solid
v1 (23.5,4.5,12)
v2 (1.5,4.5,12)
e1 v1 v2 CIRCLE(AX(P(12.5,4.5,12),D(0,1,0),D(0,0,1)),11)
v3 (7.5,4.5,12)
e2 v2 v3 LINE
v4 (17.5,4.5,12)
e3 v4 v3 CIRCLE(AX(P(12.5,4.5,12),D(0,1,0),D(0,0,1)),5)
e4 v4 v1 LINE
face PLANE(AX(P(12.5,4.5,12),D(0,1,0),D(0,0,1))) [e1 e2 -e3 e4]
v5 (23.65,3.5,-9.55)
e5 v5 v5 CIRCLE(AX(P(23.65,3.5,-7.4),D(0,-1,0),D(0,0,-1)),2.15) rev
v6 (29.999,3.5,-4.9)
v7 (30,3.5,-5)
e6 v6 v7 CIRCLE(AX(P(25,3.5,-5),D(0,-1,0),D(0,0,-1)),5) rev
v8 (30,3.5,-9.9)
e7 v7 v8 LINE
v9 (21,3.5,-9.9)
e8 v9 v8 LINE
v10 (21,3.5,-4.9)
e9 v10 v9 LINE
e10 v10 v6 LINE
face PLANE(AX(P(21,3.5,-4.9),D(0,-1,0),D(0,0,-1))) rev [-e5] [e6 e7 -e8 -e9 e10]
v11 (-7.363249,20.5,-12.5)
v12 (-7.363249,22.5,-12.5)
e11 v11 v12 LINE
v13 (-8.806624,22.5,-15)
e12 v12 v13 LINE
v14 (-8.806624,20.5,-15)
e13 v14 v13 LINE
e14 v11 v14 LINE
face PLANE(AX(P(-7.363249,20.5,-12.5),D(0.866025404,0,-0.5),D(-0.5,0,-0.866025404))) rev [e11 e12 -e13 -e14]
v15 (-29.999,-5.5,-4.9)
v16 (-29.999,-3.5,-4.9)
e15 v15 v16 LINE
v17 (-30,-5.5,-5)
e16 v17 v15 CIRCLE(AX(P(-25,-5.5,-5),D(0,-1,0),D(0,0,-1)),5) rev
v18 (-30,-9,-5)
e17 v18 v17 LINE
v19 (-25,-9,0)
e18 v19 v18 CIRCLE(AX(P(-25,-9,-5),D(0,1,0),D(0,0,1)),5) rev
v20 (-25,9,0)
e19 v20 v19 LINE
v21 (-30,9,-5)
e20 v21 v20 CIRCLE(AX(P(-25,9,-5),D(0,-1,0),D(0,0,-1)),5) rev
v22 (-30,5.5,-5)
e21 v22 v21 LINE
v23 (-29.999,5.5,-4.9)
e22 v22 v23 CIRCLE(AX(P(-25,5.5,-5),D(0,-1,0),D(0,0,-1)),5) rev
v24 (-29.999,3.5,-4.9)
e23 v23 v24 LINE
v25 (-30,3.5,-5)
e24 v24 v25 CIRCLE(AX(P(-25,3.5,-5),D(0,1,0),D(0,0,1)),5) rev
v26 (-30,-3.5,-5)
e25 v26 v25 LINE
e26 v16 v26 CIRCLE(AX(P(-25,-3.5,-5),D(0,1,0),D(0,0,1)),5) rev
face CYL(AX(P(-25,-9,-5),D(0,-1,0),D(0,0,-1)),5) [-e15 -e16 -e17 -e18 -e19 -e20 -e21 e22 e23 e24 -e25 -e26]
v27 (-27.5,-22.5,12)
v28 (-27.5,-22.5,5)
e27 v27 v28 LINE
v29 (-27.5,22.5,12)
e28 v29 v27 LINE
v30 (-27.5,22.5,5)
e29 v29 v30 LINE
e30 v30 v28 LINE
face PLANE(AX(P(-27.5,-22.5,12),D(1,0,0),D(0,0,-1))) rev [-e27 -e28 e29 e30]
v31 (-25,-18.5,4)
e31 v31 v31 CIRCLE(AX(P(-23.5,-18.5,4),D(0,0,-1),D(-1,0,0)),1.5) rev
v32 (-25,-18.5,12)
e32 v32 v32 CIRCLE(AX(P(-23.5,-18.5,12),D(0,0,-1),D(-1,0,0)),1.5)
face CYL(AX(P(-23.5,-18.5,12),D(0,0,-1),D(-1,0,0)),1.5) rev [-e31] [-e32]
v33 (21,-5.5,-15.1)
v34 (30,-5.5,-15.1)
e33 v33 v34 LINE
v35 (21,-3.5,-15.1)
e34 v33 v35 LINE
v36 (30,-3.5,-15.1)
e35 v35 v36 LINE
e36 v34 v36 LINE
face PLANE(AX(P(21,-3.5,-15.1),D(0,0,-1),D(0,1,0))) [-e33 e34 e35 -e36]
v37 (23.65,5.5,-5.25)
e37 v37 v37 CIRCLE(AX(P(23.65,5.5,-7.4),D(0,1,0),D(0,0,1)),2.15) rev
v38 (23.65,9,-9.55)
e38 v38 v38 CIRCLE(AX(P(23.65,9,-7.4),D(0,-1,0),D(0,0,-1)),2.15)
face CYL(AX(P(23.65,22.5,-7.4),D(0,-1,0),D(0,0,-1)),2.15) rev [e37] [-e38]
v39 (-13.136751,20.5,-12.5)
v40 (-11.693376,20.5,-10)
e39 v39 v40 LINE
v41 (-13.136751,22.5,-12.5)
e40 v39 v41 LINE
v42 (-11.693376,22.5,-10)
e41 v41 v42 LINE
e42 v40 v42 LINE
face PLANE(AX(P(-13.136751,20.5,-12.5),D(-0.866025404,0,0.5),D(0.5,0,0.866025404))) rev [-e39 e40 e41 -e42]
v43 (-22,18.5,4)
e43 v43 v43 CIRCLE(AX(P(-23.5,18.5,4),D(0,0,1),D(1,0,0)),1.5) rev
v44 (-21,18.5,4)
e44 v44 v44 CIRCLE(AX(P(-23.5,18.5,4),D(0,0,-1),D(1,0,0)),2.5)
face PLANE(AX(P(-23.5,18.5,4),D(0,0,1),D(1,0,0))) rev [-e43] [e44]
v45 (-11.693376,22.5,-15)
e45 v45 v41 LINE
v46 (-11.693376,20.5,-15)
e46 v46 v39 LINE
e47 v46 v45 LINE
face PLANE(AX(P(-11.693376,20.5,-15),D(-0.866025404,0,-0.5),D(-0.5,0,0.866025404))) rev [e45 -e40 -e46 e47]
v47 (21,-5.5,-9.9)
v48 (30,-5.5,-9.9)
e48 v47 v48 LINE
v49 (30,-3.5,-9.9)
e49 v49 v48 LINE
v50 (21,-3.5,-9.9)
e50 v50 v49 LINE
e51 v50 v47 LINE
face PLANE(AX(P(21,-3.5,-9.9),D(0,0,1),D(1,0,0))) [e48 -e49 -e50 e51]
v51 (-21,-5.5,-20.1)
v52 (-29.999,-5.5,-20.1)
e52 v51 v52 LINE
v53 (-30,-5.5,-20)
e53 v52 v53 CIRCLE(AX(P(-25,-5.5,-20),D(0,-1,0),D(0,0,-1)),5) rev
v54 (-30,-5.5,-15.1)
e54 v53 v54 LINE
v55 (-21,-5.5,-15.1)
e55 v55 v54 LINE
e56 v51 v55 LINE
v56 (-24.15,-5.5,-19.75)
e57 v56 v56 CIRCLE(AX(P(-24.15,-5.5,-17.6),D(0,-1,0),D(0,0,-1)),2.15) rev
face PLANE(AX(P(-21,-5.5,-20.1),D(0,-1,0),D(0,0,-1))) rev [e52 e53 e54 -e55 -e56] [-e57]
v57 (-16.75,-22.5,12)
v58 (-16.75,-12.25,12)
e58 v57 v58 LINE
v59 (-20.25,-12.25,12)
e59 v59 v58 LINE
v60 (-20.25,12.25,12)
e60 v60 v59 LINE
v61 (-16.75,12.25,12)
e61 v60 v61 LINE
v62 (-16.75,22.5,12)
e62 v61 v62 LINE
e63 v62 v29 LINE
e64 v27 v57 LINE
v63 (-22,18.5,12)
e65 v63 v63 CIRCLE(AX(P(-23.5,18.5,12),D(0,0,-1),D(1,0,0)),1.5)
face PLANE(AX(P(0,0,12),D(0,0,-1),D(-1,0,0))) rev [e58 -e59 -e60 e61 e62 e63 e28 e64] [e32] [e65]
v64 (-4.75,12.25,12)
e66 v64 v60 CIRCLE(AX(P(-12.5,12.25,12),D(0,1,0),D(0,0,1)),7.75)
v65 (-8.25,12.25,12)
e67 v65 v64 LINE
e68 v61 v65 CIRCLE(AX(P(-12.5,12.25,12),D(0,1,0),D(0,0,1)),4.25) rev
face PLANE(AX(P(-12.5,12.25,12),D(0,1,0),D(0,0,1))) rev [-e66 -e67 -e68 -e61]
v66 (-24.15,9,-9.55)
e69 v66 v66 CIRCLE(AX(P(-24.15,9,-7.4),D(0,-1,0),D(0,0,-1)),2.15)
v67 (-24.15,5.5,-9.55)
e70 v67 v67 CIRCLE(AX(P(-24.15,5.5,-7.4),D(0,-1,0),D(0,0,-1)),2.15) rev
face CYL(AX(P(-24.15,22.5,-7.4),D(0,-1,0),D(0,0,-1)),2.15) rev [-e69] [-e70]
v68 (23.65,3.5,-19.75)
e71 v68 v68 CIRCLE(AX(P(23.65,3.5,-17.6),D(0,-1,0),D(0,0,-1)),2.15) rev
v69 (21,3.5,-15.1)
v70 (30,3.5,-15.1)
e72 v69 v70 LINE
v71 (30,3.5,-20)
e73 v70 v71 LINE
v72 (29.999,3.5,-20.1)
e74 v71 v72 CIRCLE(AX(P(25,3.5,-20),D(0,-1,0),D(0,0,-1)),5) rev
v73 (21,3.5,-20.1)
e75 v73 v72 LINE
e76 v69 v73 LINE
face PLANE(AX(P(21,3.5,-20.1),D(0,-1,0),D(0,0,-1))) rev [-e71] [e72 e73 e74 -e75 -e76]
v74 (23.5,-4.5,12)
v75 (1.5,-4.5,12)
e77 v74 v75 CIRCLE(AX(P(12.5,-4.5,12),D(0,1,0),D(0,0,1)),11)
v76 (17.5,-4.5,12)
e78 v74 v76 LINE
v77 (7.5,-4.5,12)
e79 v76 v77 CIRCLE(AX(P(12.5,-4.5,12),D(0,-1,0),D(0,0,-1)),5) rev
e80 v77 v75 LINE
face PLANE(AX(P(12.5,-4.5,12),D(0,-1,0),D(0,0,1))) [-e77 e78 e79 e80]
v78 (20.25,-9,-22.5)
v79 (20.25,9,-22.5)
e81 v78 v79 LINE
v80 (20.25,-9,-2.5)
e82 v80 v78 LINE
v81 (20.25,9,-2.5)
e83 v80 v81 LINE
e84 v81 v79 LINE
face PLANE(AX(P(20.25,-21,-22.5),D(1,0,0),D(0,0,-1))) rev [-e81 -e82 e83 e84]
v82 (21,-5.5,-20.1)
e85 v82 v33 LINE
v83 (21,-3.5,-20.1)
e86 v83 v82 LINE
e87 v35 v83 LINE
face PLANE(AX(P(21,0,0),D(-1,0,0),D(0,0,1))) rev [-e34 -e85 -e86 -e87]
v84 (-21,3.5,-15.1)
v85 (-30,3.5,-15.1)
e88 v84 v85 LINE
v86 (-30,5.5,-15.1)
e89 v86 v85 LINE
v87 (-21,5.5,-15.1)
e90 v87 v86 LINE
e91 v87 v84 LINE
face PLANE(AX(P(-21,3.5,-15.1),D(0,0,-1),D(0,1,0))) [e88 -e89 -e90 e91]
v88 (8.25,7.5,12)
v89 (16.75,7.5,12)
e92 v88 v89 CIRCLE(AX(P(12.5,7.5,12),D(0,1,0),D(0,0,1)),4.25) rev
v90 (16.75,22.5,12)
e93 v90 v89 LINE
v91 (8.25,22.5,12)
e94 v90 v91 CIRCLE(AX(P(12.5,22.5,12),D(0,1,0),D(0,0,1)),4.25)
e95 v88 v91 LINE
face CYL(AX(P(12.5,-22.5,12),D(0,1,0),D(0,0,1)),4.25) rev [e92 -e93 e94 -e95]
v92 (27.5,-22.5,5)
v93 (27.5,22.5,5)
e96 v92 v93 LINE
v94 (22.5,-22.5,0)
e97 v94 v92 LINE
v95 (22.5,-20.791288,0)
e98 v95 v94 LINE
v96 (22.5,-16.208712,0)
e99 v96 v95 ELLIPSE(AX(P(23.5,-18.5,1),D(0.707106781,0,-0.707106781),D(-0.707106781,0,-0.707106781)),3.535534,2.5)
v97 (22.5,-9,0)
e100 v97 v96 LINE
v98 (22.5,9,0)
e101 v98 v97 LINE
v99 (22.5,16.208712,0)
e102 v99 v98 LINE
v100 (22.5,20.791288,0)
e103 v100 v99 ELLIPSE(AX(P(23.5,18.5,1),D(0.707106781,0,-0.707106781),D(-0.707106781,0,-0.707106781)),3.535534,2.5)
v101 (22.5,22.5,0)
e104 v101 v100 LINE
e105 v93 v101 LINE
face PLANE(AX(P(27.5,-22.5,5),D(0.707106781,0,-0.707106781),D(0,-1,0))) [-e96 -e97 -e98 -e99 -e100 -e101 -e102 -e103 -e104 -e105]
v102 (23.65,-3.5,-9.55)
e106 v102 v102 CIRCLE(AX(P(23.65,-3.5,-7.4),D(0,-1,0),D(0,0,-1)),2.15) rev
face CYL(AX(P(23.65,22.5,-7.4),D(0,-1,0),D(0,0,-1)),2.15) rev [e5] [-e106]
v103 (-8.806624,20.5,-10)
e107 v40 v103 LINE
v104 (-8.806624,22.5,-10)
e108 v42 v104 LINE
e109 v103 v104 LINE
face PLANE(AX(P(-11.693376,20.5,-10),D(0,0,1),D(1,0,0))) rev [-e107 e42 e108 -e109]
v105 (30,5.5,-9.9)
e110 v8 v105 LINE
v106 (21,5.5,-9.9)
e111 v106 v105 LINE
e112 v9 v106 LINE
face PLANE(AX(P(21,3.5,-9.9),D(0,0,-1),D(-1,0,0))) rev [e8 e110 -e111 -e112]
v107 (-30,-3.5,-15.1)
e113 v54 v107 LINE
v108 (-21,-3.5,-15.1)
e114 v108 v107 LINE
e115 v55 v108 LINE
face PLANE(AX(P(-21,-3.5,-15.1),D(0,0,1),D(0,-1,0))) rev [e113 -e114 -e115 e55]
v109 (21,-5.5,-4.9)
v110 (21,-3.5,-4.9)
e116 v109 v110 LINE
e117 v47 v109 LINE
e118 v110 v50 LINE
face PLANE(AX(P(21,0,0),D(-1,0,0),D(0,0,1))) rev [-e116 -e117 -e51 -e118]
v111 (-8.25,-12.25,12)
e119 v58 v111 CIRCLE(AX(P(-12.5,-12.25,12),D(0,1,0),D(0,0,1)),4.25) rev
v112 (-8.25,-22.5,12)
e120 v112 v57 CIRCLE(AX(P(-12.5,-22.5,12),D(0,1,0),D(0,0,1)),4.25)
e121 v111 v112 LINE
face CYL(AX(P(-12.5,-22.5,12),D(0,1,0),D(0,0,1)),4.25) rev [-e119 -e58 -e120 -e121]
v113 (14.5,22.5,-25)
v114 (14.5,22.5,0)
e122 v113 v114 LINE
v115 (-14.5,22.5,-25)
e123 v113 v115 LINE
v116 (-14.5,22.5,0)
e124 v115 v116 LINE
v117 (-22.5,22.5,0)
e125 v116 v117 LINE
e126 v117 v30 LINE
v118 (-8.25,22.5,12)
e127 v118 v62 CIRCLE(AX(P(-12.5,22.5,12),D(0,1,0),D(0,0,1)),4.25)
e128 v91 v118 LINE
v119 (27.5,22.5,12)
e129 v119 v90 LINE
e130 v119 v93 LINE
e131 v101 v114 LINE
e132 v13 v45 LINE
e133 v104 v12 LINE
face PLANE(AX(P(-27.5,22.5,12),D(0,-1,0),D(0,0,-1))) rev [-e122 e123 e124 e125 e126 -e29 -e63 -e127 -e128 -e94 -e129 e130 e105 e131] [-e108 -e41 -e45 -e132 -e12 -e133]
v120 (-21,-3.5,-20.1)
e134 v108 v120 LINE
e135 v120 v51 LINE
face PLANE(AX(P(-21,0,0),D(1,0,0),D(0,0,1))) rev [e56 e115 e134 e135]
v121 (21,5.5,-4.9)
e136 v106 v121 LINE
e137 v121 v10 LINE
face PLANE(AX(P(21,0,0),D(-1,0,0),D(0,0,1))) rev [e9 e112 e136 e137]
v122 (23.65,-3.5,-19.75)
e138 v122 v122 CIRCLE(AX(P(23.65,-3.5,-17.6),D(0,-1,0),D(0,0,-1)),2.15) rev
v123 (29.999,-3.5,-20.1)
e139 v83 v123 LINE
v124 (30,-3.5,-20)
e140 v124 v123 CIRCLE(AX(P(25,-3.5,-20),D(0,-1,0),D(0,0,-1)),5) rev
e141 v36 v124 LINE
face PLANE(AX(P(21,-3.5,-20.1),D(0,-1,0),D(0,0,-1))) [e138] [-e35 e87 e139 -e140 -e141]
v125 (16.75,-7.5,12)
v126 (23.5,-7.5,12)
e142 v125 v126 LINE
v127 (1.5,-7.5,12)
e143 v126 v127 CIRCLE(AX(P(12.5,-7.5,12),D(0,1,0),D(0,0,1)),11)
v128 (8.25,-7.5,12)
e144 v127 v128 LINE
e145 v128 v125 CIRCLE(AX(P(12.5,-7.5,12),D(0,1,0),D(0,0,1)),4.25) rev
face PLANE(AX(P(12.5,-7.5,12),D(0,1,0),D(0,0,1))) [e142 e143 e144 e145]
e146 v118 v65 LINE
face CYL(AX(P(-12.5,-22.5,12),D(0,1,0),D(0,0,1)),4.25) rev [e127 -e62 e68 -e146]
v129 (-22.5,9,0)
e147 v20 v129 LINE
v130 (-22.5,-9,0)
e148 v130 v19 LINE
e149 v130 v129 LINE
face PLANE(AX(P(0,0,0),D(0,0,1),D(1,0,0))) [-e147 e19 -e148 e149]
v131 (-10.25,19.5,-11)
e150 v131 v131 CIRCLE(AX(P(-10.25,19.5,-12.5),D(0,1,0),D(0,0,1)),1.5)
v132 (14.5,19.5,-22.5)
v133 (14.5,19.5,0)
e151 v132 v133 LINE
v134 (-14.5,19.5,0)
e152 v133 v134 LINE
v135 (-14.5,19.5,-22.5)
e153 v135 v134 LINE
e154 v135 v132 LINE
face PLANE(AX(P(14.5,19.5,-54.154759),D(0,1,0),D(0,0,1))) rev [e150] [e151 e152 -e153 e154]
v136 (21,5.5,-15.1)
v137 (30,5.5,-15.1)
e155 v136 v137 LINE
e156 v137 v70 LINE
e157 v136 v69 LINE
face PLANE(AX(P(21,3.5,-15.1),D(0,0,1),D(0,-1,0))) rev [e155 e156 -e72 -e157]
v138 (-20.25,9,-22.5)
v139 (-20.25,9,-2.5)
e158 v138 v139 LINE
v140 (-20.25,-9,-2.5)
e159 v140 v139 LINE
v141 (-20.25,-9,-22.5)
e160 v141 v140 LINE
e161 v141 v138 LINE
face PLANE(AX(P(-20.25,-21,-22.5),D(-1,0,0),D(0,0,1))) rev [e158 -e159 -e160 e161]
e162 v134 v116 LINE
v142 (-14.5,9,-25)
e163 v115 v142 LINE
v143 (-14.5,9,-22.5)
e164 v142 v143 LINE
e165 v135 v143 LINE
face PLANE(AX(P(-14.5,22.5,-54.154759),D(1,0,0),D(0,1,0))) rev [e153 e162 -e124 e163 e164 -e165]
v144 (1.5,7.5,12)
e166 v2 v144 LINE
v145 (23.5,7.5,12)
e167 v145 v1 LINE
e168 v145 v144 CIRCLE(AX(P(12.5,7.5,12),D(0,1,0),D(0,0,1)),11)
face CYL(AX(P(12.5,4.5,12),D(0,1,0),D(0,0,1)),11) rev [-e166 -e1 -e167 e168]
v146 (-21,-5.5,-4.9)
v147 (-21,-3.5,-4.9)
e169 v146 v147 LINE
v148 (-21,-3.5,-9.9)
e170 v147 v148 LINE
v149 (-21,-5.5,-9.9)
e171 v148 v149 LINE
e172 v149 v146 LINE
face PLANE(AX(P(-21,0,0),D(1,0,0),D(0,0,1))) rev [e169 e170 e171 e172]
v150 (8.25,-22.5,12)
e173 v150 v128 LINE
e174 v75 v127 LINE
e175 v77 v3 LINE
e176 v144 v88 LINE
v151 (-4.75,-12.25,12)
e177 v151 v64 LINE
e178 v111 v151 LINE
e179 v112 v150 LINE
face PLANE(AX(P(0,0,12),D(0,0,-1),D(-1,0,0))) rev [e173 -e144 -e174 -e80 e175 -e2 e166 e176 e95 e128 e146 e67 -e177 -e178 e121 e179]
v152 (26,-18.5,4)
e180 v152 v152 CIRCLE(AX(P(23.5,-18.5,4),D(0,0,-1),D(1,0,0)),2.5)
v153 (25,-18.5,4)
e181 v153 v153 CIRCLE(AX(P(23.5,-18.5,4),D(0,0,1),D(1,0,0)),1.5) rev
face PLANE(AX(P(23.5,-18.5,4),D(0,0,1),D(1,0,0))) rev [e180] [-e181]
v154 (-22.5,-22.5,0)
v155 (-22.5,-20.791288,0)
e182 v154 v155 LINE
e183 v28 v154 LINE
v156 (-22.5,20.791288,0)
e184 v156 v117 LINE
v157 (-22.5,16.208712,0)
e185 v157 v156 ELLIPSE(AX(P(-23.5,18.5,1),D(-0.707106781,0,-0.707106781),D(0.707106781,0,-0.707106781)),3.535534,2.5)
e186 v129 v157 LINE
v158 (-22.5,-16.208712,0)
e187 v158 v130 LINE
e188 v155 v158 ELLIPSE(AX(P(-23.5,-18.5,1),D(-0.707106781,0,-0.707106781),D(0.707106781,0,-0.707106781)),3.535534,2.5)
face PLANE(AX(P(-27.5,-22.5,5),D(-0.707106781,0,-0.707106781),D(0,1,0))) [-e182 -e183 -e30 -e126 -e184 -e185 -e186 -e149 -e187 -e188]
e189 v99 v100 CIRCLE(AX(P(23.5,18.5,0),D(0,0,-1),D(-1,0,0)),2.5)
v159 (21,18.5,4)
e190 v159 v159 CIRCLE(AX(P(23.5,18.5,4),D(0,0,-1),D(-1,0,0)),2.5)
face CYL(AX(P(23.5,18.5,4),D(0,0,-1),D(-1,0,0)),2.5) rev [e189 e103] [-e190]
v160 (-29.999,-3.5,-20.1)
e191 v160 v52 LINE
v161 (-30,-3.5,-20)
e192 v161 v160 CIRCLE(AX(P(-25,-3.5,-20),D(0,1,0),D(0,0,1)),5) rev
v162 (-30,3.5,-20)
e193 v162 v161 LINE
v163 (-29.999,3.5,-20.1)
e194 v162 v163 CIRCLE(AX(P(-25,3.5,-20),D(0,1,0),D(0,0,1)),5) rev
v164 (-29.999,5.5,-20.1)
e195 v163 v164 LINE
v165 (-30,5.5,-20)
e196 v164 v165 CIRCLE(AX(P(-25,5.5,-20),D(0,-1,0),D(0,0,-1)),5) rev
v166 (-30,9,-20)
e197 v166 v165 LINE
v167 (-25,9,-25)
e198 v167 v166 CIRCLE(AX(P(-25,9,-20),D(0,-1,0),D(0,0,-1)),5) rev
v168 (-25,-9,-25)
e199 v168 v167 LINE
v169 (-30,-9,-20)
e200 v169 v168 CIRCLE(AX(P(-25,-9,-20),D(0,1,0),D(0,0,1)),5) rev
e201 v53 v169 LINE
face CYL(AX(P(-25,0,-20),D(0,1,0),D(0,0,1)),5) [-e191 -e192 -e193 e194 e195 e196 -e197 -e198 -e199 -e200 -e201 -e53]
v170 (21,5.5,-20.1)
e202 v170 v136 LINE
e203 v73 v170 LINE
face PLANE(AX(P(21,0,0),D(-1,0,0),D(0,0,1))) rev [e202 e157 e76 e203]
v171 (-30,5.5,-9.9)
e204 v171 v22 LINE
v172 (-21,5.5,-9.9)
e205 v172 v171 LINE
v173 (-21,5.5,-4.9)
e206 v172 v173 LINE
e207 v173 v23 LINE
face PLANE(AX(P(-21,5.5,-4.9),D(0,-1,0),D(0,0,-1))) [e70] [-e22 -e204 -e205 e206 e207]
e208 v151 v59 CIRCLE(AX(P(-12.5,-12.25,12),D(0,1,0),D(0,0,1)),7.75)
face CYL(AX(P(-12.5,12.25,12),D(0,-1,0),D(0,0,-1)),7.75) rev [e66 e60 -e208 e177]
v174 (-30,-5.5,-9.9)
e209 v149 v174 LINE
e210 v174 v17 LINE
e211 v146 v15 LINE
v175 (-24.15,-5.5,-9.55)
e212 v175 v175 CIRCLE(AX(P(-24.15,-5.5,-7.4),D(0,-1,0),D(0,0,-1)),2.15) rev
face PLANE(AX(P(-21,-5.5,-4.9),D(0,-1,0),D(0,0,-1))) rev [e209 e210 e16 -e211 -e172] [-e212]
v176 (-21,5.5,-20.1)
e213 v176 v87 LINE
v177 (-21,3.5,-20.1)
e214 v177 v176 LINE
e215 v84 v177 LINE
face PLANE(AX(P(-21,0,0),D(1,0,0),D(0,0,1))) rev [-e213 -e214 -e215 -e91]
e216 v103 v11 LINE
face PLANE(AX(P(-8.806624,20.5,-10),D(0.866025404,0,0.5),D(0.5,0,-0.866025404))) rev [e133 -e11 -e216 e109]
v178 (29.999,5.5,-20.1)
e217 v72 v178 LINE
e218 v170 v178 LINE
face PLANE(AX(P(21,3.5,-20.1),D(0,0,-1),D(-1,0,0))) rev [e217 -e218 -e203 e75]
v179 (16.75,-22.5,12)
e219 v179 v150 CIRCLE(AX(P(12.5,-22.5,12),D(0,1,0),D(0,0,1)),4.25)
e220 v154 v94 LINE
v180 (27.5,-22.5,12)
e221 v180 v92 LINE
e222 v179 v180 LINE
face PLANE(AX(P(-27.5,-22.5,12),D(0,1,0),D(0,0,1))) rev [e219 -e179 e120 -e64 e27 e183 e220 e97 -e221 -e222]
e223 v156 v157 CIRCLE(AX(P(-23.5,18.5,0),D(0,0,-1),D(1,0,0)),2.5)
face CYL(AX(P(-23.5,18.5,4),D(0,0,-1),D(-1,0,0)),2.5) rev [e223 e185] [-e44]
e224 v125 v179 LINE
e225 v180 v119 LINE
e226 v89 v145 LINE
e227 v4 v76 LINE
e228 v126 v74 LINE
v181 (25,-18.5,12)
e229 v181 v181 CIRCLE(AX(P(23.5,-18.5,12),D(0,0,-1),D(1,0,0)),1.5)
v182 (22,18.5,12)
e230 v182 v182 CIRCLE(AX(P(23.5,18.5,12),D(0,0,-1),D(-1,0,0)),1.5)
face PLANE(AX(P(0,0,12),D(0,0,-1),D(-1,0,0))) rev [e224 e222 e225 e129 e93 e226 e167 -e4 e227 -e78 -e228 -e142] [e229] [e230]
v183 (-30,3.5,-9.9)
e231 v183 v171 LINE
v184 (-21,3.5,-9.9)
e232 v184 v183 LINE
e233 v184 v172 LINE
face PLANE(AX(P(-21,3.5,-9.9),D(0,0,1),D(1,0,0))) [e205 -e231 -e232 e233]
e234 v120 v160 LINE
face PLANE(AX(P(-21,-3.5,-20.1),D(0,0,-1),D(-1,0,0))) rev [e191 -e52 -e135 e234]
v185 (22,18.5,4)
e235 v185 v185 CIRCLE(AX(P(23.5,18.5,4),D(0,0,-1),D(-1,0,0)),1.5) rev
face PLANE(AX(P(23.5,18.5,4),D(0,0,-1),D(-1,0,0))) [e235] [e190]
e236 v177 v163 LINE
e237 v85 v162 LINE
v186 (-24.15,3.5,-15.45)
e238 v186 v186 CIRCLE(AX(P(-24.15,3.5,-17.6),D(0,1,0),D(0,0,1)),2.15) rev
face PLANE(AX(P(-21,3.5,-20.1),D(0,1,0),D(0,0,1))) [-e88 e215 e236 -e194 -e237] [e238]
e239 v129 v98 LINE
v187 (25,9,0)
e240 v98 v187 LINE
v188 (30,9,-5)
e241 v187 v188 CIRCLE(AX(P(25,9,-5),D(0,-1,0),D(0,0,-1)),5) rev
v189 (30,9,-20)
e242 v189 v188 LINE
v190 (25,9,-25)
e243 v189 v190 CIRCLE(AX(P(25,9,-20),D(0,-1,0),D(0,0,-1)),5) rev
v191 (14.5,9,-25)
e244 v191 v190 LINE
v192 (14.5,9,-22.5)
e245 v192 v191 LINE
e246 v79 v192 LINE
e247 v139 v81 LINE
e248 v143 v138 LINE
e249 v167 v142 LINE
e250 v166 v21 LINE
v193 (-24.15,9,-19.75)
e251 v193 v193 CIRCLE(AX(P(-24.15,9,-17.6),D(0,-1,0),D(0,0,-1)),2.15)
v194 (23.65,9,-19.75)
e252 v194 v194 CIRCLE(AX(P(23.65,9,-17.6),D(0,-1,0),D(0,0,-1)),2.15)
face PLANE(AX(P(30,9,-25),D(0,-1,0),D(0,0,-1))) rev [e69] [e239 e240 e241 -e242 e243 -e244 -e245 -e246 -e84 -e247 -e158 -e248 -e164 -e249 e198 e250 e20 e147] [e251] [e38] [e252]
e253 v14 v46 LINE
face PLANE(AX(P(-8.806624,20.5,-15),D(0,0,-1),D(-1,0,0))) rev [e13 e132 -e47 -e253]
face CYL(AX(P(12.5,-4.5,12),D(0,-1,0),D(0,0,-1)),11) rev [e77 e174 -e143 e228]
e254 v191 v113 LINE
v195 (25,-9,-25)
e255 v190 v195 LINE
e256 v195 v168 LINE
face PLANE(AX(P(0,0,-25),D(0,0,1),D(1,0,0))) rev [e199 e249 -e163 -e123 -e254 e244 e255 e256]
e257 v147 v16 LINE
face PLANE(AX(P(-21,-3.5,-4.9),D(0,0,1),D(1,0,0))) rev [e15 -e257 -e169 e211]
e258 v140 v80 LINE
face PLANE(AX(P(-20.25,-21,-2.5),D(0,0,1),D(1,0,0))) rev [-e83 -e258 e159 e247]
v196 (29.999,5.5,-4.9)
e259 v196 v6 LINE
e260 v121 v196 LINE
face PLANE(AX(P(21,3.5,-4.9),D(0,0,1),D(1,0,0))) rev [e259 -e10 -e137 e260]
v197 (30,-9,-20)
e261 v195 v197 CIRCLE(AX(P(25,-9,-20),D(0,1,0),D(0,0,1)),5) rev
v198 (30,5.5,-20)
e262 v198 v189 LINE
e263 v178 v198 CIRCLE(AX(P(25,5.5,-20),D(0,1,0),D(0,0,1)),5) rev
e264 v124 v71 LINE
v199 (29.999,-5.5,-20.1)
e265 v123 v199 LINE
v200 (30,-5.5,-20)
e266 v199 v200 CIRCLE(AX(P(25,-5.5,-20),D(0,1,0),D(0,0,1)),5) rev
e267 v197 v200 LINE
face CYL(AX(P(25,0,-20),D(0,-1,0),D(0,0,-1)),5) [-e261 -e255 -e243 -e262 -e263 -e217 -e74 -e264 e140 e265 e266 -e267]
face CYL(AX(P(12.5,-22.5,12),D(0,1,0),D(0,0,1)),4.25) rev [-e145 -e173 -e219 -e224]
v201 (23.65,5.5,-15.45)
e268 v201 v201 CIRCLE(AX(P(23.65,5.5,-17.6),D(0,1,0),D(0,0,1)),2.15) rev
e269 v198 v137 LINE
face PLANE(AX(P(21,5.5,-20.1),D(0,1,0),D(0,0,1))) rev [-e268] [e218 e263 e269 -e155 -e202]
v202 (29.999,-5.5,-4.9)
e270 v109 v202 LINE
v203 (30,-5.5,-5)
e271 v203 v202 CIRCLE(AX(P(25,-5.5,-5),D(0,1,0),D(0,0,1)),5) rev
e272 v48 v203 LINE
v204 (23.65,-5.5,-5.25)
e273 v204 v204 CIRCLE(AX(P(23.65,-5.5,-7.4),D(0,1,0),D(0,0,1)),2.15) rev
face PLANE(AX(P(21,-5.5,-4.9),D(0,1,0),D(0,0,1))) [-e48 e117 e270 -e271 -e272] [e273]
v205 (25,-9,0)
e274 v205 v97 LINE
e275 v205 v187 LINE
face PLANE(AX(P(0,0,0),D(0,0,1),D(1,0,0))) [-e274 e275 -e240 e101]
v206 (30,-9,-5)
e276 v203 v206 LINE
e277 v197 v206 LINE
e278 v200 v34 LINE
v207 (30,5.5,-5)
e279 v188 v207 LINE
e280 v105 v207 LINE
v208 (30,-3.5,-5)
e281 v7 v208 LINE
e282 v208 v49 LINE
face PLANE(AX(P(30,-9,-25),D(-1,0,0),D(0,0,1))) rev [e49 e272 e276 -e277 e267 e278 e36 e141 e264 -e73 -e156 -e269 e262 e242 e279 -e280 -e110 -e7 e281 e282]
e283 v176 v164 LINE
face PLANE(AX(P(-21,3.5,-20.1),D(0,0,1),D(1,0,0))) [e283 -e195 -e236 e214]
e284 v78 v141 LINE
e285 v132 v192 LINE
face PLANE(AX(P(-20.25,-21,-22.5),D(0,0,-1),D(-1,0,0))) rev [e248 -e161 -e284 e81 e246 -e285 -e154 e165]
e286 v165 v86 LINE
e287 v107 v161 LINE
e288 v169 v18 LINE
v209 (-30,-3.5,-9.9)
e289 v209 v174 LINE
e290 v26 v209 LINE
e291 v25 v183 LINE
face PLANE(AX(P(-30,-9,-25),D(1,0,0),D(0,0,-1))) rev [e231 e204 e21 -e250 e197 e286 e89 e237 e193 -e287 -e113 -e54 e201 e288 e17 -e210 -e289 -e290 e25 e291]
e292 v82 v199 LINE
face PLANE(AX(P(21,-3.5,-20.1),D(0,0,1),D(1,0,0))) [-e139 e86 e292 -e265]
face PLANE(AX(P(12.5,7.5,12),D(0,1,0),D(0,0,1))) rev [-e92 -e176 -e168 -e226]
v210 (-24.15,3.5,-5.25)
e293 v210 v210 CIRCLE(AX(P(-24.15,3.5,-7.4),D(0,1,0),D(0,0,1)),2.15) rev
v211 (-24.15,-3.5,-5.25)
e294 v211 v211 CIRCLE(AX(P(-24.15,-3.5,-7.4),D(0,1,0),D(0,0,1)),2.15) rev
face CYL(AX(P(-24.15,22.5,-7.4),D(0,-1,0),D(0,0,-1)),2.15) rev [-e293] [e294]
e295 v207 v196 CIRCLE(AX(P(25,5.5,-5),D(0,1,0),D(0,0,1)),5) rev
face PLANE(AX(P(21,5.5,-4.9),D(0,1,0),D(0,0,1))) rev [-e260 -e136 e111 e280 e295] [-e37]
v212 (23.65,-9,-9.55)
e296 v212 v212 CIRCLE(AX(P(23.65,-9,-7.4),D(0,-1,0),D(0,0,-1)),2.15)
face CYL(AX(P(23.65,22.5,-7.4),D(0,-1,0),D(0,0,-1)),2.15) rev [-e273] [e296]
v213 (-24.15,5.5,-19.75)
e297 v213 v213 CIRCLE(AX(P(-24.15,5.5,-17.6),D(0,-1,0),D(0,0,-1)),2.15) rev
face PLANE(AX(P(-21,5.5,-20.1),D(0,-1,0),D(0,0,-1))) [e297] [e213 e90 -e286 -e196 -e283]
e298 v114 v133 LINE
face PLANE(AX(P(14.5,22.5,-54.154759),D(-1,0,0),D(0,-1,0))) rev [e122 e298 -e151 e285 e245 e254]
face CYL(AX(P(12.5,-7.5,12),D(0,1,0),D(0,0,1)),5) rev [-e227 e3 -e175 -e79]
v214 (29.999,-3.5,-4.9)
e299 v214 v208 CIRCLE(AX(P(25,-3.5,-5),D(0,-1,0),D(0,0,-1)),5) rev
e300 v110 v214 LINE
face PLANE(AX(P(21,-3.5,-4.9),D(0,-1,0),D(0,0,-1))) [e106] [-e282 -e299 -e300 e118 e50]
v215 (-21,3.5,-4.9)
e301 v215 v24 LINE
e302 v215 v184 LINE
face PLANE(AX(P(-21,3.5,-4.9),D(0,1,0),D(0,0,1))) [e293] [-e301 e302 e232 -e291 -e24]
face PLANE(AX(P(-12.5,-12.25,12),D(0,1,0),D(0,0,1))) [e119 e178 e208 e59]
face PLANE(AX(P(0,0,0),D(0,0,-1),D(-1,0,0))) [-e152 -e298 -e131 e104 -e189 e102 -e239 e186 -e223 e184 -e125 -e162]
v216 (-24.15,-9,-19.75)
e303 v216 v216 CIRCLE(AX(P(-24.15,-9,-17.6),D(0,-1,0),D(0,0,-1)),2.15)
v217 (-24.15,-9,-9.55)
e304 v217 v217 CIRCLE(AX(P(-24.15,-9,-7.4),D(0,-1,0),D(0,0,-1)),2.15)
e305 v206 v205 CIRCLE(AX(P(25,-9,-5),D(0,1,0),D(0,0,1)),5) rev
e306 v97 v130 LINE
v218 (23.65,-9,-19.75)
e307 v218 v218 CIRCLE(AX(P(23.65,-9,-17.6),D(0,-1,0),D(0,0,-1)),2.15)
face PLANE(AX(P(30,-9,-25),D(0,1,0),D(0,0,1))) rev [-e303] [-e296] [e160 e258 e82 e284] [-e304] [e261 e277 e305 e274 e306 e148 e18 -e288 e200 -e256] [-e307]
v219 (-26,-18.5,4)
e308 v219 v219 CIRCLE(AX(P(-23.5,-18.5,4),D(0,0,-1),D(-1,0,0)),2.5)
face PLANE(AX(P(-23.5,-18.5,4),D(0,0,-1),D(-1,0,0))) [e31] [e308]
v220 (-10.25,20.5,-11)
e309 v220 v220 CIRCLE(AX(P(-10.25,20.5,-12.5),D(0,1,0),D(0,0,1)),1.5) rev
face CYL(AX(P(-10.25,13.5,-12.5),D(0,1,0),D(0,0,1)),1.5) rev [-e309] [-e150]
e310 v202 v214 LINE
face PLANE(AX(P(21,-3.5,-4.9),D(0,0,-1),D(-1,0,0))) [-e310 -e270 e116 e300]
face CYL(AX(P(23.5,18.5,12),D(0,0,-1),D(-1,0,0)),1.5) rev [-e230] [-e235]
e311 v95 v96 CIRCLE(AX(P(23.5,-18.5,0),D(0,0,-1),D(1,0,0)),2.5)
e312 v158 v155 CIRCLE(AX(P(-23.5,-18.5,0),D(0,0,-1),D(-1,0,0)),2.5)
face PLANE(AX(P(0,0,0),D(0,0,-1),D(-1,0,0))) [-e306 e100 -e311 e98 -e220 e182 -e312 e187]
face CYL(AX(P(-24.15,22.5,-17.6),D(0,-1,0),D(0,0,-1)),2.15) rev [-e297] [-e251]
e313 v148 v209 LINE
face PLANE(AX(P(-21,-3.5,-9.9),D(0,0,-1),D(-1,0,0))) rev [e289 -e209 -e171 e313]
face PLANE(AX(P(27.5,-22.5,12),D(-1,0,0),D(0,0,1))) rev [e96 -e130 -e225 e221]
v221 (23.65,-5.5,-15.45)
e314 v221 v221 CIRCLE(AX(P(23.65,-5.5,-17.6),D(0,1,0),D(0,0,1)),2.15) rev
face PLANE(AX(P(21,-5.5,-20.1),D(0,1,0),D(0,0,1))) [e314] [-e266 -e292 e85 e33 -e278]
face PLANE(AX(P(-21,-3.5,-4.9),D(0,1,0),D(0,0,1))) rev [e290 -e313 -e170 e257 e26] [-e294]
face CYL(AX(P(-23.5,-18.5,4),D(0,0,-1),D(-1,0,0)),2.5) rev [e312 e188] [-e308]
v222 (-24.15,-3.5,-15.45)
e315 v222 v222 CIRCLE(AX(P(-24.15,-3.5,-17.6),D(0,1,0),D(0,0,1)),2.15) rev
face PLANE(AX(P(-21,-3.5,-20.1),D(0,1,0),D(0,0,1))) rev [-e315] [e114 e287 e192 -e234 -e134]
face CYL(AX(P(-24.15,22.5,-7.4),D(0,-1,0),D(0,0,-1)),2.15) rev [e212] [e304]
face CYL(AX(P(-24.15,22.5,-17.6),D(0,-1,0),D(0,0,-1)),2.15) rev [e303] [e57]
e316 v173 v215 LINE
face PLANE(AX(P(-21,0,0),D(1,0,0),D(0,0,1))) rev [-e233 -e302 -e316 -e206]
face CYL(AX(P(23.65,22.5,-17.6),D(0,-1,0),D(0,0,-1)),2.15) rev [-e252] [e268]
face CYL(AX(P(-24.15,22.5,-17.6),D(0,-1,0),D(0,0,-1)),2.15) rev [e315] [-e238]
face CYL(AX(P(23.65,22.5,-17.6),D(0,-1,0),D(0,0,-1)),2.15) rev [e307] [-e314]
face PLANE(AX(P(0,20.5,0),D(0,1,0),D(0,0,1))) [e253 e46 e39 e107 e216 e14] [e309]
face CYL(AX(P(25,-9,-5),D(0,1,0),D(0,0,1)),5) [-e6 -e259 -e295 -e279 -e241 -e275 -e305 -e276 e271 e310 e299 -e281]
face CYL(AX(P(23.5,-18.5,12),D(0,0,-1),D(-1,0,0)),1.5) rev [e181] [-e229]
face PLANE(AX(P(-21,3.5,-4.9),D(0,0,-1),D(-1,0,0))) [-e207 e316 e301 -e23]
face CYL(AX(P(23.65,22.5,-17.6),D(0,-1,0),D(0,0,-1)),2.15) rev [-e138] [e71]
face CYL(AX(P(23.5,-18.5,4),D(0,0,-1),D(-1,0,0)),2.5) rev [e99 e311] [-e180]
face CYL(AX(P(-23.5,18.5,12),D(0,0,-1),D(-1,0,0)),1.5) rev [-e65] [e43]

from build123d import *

# Parameters (mm, degrees)
ESQUISSE1_W                  = 55
ESQUISSE1_H                  = 45
BOSS_EXTRU_1_DEPTH           = 12
ESQUISSE2_R                  = 4.25
ENL_V_MAT_EXTRU_1_DEPTH      = 55.085580333
ENL_V_MAT_EXTRU_2_DEPTH      = 12.25
ENL_V_MAT_EXTRU_2_DEPTH_BACK = 12.25
ESQUISSE3_R                  = 7.75
ESQUISSE4_R                  = 11
ENL_V_MAT_EXTRU_3_DEPTH      = 3
ESQUISSE5_R                  = 5
ENL_V_MAT_EXTRU_4_DEPTH      = 15
ENL_V_MAT_EXTRU_5_DEPTH      = 38.503333185
ENL_V_MAT_EXTRU_5_DEPTH_BACK = 38.503333185
ESQUISSE6_R                  = 1.5
ESQUISSE7_R                  = 2.5
ENL_V_MAT_EXTRU_6_DEPTH      = 4
CHANFREIN3_SIZE              = 5
ESQUISSE9_W                  = 60
ESQUISSE9_H                  = 18
BOSS_EXTRU_2_DEPTH           = 25
ESQUISSE10_W                 = 40.5
ESQUISSE10_H                 = 20
ENL_V_MAT_EXTRU_7_DEPTH      = 30
ESQUISSE11_R                 = 2.15
ENL_V_MAT_EXTRU_8_DEPTH      = 51.17220346
CONG_2_R                     = 5
CONG_3_R                     = 5
ESQUISSE12_W                 = 5
ESQUISSE12_H                 = 2
ENL_V_MAT_EXTRU_9_DEPTH      = 9
SYM_TRIE4_COPY_1_SKETCH_W    = 5
SYM_TRIE4_COPY_1_SKETCH_H    = 2
SYM_TRIE4_COPY_1_DEPTH       = 9
ESQUISSE13_W                 = 29
ESQUISSE13_H                 = 3
BOSS_EXTRU_3_DEPTH           = 25
BOSS_EXTRU_4_REACH           = 52.172
ESQUISSE14_W                 = 29
ESQUISSE14_H                 = 2.5
ESQUISSE15_R                 = 1.5
ENL_V_MAT_EXTRU_10_DEPTH     = 9
ENL_V_MAT_EXTRU_11_DEPTH     = 2


with BuildPart() as part:
    # Esquisse1 → Boss.-Extru.1 (new body)
    with BuildSketch(Plane.XY):
        Rectangle(ESQUISSE1_W, ESQUISSE1_H)
    extrude(amount=BOSS_EXTRU_1_DEPTH)

    # Esquisse2 → Enlèv. mat.-Extru.1 (cut, through all)
    with BuildSketch(Plane(origin=(0, 22.5, 0), x_dir=(1, 0, 0), z_dir=(0, 1, 0))):
        with Locations((-12.5, -12)):
            Circle(ESQUISSE2_R)
        with Locations((12.5, -12)):
            Circle(ESQUISSE2_R)
    extrude(amount=-ENL_V_MAT_EXTRU_1_DEPTH, mode=Mode.SUBTRACT)

    # Esquisse3 → Enlèv. mat.-Extru.2 (cut, two sides: drawn at the far end of the back side and taken through both)
    with BuildSketch(Plane(origin=(0, 0, 0), x_dir=(1, 0, 0), z_dir=(0, 1, 0)).offset(-ENL_V_MAT_EXTRU_2_DEPTH_BACK)):
        with Locations((-12.5, -12)):
            Circle(ESQUISSE3_R)
    extrude(amount=ENL_V_MAT_EXTRU_2_DEPTH + ENL_V_MAT_EXTRU_2_DEPTH_BACK, mode=Mode.SUBTRACT)

    # Esquisse4 → Enlèv. mat.-Extru.3 (cut)
    with BuildSketch(Plane(origin=(0, 7.5, 0), x_dir=(1, 0, 0), z_dir=(0, 1, 0))):
        with Locations((12.5, -12)):
            Circle(ESQUISSE4_R)
    enl_v_mat_extru_3 = extrude(amount=-ENL_V_MAT_EXTRU_3_DEPTH, mode=Mode.SUBTRACT)

    # Esquisse5 → Enlèv. mat.-Extru.4 (cut)
    with BuildSketch(Plane(origin=(0, 7.5, 0), x_dir=(1, 0, 0), z_dir=(0, 1, 0))):
        with Locations((12.5, -12)):
            Circle(ESQUISSE5_R)
    extrude(amount=-ENL_V_MAT_EXTRU_4_DEPTH, mode=Mode.SUBTRACT)

    # Esquisse6 → Enlèv. mat.-Extru.5 (cut, two sides: drawn at the far end of the back side and taken through both)
    with BuildSketch(Plane(origin=(0, 0, 0), x_dir=(-1, 0, 0), z_dir=(0, 0, -1)).offset(-ENL_V_MAT_EXTRU_5_DEPTH_BACK)):
        with Locations((23.5, -18.5)):
            Circle(ESQUISSE6_R)
        with Locations((-23.5, -18.5)):
            Circle(ESQUISSE6_R)
        with Locations((-23.5, 18.5)):
            Circle(ESQUISSE6_R)
        with Locations((23.5, 18.5)):
            Circle(ESQUISSE6_R)
    extrude(amount=ENL_V_MAT_EXTRU_5_DEPTH + ENL_V_MAT_EXTRU_5_DEPTH_BACK, mode=Mode.SUBTRACT)

    # Esquisse7 → Enlèv. mat.-Extru.6 (cut)
    with BuildSketch(Plane(origin=(0, 0, 0), x_dir=(-1, 0, 0), z_dir=(0, 0, -1))):
        with Locations((23.5, -18.5)):
            Circle(ESQUISSE7_R)
        with Locations(Location((23.5, 18.5, 0), (0, 0, 180))):
            Circle(ESQUISSE7_R)
        with Locations((-23.5, 18.5)):
            Circle(ESQUISSE7_R)
        with Locations(Location((-23.5, -18.5, 0), (0, 0, 180))):
            Circle(ESQUISSE7_R)
    extrude(amount=-ENL_V_MAT_EXTRU_6_DEPTH, mode=Mode.SUBTRACT)

    # Chanfrein3
    # the kernel refuses this chamfer: 5 mm, written as the material it takes off along each edge
    with BuildSketch(Plane(origin=(-27.5, 35.35841494, 0), x_dir=(0.9996219169112968, 0, -0.027495876610586372), z_dir=(0, -1, 0)), Plane(origin=(27.5, -35.35841494, 0), x_dir=(-0.9996219169112968, 0, -0.027495876610586372), z_dir=(0, 1, 0))) as chanfrein3_piece_1:
        Polygon((CHANFREIN3_SIZE * 0.999621916911, CHANFREIN3_SIZE * 0.0274958766106), (-CHANFREIN3_SIZE * 0.0274958766106, CHANFREIN3_SIZE * 0.999621916911), (0, 0), align=None)
    extrude(amount=70.71682988, mode=Mode.SUBTRACT)

    # Symétrie2: Enlèv. mat.-Extru.3 across plane
    add(enl_v_mat_extru_3.mirror(Plane.ZX), mode=Mode.SUBTRACT)

    # Esquisse9 → Boss.-Extru.2 (add)
    with BuildSketch(Plane(origin=(0, 0, 0), x_dir=(-1, 0, 0), z_dir=(0, 0, -1))):
        Rectangle(ESQUISSE9_W, ESQUISSE9_H)
    extrude(amount=BOSS_EXTRU_2_DEPTH)

    # Esquisse10 → Enlèv. mat.-Extru.7 (cut)
    with BuildSketch(Plane(origin=(0, 9, 0), x_dir=(1, 0, 0), z_dir=(0, 1, 0))):
        with Locations((0, 12.5)):
            Rectangle(ESQUISSE10_W, ESQUISSE10_H)
    extrude(amount=-ENL_V_MAT_EXTRU_7_DEPTH, mode=Mode.SUBTRACT)

    # Esquisse11 → Enlèv. mat.-Extru.8 (cut, through all)
    with BuildSketch(Plane(origin=(0, -9, 0), x_dir=(-1, 0, 0), z_dir=(0, -1, 0))):
        with Locations(Location((-23.65, 7.4, 0), (0, 0, 90))):
            Circle(ESQUISSE11_R)
        with Locations(Location((-23.65, 17.6, 0), (0, 0, 90))):
            Circle(ESQUISSE11_R)
        with Locations(Location((24.15, 7.4, 0), (0, 0, 90))):
            Circle(ESQUISSE11_R)
        with Locations(Location((24.15, 17.6, 0), (0, 0, 90))):
            Circle(ESQUISSE11_R)
    extrude(amount=-ENL_V_MAT_EXTRU_8_DEPTH, mode=Mode.SUBTRACT)

    # Congé2
    cong_2_edges = [part.edges().sort_by_distance(p)[0] for p in [
        (-30, 0, 0),
        (30, 0, 0),
    ]]
    fillet(cong_2_edges, radius=CONG_2_R)

    # Congé3
    cong_3_edges = [part.edges().sort_by_distance(p)[0] for p in [
        (-30, 0, -25),
        (30, 0, -25),
    ]]
    fillet(cong_3_edges, radius=CONG_3_R)

    # Esquisse12 → Enlèv. mat.-Extru.9 (cut)
    with BuildSketch(Plane(origin=(30, 0, 0), x_dir=(0, 0, -1), z_dir=(1, 0, 0))):
        with Locations((7.4, 4.5)):
            Rectangle(ESQUISSE12_W, ESQUISSE12_H)
        with Locations((17.6, 4.5)):
            Rectangle(ESQUISSE12_W, ESQUISSE12_H)
    enl_v_mat_extru_9 = extrude(amount=-ENL_V_MAT_EXTRU_9_DEPTH, mode=Mode.SUBTRACT)

    # Symétrie3: Enlèv. mat.-Extru.9 across plane
    add(enl_v_mat_extru_9.mirror(Plane(origin=(0, 0, 0), x_dir=(0, 0, 1), z_dir=(1, 0, 0))), mode=Mode.SUBTRACT)

    # Symétrie4: Enlèv. mat.-Extru.9 across plane
    add(enl_v_mat_extru_9.mirror(Plane.ZX), mode=Mode.SUBTRACT)

    # Symétrie4 copy 1 sketch → Symétrie4 copy 1 (cut)
    with BuildSketch(Plane(origin=(-30, 0, 0), x_dir=(0, 0, -1), z_dir=(-1, 0, 0))):
        with Locations((7.4, 4.5)):
            Rectangle(SYM_TRIE4_COPY_1_SKETCH_W, SYM_TRIE4_COPY_1_SKETCH_H)
        with Locations((17.6, 4.5)):
            Rectangle(SYM_TRIE4_COPY_1_SKETCH_W, SYM_TRIE4_COPY_1_SKETCH_H)
    extrude(amount=-SYM_TRIE4_COPY_1_DEPTH, mode=Mode.SUBTRACT)

    # Esquisse13 → Boss.-Extru.3 (add)
    with BuildSketch(Plane(origin=(0, 0, 0), x_dir=(-1, 0, 0), z_dir=(0, 0, -1))):
        with Locations((0, 21)):
            Rectangle(ESQUISSE13_W, ESQUISSE13_H)
    extrude(amount=BOSS_EXTRU_3_DEPTH)

    # Esquisse14 → Boss.-Extru.4 (add, up to next)
    with BuildSketch(Plane(origin=(0, 9, 0), x_dir=(1, 0, 0), z_dir=(0, 1, 0)), mode=Mode.PRIVATE) as boss_extru_4_sk1:
        with Locations((0, 23.75)):
            Rectangle(ESQUISSE14_W, ESQUISSE14_H)
    boss_extru_4_tool1 = extrude(boss_extru_4_sk1.sketch, amount=BOSS_EXTRU_4_REACH, mode=Mode.PRIVATE) - part.part
    add(boss_extru_4_tool1.solids().sort_by_distance((0, 9, -23.75))[0])

    # Esquisse15 → Enlèv. mat.-Extru.10 (cut)
    with BuildSketch(Plane(origin=(0, 22.5, 0), x_dir=(1, 0, 0), z_dir=(0, 1, 0))):
        with Locations(Location((-10.25, 12.5, 0), (0, 0, 270))):
            Circle(ESQUISSE15_R)
    extrude(amount=-ENL_V_MAT_EXTRU_10_DEPTH, mode=Mode.SUBTRACT)

    # Esquisse16 → Enlèv. mat.-Extru.11 (cut)
    with BuildSketch(Plane(origin=(0, 22.5, 0), x_dir=(1, 0, 0), z_dir=(0, 1, 0))):
        Polygon((-8.806624327, 15), (-11.693375673, 15), (-13.136751346, 12.5), (-11.693375673, 10), (-8.806624327, 10), (-7.363248654, 12.5), align=None)
    extrude(amount=-ENL_V_MAT_EXTRU_11_DEPTH, mode=Mode.SUBTRACT)


solid = part.part
